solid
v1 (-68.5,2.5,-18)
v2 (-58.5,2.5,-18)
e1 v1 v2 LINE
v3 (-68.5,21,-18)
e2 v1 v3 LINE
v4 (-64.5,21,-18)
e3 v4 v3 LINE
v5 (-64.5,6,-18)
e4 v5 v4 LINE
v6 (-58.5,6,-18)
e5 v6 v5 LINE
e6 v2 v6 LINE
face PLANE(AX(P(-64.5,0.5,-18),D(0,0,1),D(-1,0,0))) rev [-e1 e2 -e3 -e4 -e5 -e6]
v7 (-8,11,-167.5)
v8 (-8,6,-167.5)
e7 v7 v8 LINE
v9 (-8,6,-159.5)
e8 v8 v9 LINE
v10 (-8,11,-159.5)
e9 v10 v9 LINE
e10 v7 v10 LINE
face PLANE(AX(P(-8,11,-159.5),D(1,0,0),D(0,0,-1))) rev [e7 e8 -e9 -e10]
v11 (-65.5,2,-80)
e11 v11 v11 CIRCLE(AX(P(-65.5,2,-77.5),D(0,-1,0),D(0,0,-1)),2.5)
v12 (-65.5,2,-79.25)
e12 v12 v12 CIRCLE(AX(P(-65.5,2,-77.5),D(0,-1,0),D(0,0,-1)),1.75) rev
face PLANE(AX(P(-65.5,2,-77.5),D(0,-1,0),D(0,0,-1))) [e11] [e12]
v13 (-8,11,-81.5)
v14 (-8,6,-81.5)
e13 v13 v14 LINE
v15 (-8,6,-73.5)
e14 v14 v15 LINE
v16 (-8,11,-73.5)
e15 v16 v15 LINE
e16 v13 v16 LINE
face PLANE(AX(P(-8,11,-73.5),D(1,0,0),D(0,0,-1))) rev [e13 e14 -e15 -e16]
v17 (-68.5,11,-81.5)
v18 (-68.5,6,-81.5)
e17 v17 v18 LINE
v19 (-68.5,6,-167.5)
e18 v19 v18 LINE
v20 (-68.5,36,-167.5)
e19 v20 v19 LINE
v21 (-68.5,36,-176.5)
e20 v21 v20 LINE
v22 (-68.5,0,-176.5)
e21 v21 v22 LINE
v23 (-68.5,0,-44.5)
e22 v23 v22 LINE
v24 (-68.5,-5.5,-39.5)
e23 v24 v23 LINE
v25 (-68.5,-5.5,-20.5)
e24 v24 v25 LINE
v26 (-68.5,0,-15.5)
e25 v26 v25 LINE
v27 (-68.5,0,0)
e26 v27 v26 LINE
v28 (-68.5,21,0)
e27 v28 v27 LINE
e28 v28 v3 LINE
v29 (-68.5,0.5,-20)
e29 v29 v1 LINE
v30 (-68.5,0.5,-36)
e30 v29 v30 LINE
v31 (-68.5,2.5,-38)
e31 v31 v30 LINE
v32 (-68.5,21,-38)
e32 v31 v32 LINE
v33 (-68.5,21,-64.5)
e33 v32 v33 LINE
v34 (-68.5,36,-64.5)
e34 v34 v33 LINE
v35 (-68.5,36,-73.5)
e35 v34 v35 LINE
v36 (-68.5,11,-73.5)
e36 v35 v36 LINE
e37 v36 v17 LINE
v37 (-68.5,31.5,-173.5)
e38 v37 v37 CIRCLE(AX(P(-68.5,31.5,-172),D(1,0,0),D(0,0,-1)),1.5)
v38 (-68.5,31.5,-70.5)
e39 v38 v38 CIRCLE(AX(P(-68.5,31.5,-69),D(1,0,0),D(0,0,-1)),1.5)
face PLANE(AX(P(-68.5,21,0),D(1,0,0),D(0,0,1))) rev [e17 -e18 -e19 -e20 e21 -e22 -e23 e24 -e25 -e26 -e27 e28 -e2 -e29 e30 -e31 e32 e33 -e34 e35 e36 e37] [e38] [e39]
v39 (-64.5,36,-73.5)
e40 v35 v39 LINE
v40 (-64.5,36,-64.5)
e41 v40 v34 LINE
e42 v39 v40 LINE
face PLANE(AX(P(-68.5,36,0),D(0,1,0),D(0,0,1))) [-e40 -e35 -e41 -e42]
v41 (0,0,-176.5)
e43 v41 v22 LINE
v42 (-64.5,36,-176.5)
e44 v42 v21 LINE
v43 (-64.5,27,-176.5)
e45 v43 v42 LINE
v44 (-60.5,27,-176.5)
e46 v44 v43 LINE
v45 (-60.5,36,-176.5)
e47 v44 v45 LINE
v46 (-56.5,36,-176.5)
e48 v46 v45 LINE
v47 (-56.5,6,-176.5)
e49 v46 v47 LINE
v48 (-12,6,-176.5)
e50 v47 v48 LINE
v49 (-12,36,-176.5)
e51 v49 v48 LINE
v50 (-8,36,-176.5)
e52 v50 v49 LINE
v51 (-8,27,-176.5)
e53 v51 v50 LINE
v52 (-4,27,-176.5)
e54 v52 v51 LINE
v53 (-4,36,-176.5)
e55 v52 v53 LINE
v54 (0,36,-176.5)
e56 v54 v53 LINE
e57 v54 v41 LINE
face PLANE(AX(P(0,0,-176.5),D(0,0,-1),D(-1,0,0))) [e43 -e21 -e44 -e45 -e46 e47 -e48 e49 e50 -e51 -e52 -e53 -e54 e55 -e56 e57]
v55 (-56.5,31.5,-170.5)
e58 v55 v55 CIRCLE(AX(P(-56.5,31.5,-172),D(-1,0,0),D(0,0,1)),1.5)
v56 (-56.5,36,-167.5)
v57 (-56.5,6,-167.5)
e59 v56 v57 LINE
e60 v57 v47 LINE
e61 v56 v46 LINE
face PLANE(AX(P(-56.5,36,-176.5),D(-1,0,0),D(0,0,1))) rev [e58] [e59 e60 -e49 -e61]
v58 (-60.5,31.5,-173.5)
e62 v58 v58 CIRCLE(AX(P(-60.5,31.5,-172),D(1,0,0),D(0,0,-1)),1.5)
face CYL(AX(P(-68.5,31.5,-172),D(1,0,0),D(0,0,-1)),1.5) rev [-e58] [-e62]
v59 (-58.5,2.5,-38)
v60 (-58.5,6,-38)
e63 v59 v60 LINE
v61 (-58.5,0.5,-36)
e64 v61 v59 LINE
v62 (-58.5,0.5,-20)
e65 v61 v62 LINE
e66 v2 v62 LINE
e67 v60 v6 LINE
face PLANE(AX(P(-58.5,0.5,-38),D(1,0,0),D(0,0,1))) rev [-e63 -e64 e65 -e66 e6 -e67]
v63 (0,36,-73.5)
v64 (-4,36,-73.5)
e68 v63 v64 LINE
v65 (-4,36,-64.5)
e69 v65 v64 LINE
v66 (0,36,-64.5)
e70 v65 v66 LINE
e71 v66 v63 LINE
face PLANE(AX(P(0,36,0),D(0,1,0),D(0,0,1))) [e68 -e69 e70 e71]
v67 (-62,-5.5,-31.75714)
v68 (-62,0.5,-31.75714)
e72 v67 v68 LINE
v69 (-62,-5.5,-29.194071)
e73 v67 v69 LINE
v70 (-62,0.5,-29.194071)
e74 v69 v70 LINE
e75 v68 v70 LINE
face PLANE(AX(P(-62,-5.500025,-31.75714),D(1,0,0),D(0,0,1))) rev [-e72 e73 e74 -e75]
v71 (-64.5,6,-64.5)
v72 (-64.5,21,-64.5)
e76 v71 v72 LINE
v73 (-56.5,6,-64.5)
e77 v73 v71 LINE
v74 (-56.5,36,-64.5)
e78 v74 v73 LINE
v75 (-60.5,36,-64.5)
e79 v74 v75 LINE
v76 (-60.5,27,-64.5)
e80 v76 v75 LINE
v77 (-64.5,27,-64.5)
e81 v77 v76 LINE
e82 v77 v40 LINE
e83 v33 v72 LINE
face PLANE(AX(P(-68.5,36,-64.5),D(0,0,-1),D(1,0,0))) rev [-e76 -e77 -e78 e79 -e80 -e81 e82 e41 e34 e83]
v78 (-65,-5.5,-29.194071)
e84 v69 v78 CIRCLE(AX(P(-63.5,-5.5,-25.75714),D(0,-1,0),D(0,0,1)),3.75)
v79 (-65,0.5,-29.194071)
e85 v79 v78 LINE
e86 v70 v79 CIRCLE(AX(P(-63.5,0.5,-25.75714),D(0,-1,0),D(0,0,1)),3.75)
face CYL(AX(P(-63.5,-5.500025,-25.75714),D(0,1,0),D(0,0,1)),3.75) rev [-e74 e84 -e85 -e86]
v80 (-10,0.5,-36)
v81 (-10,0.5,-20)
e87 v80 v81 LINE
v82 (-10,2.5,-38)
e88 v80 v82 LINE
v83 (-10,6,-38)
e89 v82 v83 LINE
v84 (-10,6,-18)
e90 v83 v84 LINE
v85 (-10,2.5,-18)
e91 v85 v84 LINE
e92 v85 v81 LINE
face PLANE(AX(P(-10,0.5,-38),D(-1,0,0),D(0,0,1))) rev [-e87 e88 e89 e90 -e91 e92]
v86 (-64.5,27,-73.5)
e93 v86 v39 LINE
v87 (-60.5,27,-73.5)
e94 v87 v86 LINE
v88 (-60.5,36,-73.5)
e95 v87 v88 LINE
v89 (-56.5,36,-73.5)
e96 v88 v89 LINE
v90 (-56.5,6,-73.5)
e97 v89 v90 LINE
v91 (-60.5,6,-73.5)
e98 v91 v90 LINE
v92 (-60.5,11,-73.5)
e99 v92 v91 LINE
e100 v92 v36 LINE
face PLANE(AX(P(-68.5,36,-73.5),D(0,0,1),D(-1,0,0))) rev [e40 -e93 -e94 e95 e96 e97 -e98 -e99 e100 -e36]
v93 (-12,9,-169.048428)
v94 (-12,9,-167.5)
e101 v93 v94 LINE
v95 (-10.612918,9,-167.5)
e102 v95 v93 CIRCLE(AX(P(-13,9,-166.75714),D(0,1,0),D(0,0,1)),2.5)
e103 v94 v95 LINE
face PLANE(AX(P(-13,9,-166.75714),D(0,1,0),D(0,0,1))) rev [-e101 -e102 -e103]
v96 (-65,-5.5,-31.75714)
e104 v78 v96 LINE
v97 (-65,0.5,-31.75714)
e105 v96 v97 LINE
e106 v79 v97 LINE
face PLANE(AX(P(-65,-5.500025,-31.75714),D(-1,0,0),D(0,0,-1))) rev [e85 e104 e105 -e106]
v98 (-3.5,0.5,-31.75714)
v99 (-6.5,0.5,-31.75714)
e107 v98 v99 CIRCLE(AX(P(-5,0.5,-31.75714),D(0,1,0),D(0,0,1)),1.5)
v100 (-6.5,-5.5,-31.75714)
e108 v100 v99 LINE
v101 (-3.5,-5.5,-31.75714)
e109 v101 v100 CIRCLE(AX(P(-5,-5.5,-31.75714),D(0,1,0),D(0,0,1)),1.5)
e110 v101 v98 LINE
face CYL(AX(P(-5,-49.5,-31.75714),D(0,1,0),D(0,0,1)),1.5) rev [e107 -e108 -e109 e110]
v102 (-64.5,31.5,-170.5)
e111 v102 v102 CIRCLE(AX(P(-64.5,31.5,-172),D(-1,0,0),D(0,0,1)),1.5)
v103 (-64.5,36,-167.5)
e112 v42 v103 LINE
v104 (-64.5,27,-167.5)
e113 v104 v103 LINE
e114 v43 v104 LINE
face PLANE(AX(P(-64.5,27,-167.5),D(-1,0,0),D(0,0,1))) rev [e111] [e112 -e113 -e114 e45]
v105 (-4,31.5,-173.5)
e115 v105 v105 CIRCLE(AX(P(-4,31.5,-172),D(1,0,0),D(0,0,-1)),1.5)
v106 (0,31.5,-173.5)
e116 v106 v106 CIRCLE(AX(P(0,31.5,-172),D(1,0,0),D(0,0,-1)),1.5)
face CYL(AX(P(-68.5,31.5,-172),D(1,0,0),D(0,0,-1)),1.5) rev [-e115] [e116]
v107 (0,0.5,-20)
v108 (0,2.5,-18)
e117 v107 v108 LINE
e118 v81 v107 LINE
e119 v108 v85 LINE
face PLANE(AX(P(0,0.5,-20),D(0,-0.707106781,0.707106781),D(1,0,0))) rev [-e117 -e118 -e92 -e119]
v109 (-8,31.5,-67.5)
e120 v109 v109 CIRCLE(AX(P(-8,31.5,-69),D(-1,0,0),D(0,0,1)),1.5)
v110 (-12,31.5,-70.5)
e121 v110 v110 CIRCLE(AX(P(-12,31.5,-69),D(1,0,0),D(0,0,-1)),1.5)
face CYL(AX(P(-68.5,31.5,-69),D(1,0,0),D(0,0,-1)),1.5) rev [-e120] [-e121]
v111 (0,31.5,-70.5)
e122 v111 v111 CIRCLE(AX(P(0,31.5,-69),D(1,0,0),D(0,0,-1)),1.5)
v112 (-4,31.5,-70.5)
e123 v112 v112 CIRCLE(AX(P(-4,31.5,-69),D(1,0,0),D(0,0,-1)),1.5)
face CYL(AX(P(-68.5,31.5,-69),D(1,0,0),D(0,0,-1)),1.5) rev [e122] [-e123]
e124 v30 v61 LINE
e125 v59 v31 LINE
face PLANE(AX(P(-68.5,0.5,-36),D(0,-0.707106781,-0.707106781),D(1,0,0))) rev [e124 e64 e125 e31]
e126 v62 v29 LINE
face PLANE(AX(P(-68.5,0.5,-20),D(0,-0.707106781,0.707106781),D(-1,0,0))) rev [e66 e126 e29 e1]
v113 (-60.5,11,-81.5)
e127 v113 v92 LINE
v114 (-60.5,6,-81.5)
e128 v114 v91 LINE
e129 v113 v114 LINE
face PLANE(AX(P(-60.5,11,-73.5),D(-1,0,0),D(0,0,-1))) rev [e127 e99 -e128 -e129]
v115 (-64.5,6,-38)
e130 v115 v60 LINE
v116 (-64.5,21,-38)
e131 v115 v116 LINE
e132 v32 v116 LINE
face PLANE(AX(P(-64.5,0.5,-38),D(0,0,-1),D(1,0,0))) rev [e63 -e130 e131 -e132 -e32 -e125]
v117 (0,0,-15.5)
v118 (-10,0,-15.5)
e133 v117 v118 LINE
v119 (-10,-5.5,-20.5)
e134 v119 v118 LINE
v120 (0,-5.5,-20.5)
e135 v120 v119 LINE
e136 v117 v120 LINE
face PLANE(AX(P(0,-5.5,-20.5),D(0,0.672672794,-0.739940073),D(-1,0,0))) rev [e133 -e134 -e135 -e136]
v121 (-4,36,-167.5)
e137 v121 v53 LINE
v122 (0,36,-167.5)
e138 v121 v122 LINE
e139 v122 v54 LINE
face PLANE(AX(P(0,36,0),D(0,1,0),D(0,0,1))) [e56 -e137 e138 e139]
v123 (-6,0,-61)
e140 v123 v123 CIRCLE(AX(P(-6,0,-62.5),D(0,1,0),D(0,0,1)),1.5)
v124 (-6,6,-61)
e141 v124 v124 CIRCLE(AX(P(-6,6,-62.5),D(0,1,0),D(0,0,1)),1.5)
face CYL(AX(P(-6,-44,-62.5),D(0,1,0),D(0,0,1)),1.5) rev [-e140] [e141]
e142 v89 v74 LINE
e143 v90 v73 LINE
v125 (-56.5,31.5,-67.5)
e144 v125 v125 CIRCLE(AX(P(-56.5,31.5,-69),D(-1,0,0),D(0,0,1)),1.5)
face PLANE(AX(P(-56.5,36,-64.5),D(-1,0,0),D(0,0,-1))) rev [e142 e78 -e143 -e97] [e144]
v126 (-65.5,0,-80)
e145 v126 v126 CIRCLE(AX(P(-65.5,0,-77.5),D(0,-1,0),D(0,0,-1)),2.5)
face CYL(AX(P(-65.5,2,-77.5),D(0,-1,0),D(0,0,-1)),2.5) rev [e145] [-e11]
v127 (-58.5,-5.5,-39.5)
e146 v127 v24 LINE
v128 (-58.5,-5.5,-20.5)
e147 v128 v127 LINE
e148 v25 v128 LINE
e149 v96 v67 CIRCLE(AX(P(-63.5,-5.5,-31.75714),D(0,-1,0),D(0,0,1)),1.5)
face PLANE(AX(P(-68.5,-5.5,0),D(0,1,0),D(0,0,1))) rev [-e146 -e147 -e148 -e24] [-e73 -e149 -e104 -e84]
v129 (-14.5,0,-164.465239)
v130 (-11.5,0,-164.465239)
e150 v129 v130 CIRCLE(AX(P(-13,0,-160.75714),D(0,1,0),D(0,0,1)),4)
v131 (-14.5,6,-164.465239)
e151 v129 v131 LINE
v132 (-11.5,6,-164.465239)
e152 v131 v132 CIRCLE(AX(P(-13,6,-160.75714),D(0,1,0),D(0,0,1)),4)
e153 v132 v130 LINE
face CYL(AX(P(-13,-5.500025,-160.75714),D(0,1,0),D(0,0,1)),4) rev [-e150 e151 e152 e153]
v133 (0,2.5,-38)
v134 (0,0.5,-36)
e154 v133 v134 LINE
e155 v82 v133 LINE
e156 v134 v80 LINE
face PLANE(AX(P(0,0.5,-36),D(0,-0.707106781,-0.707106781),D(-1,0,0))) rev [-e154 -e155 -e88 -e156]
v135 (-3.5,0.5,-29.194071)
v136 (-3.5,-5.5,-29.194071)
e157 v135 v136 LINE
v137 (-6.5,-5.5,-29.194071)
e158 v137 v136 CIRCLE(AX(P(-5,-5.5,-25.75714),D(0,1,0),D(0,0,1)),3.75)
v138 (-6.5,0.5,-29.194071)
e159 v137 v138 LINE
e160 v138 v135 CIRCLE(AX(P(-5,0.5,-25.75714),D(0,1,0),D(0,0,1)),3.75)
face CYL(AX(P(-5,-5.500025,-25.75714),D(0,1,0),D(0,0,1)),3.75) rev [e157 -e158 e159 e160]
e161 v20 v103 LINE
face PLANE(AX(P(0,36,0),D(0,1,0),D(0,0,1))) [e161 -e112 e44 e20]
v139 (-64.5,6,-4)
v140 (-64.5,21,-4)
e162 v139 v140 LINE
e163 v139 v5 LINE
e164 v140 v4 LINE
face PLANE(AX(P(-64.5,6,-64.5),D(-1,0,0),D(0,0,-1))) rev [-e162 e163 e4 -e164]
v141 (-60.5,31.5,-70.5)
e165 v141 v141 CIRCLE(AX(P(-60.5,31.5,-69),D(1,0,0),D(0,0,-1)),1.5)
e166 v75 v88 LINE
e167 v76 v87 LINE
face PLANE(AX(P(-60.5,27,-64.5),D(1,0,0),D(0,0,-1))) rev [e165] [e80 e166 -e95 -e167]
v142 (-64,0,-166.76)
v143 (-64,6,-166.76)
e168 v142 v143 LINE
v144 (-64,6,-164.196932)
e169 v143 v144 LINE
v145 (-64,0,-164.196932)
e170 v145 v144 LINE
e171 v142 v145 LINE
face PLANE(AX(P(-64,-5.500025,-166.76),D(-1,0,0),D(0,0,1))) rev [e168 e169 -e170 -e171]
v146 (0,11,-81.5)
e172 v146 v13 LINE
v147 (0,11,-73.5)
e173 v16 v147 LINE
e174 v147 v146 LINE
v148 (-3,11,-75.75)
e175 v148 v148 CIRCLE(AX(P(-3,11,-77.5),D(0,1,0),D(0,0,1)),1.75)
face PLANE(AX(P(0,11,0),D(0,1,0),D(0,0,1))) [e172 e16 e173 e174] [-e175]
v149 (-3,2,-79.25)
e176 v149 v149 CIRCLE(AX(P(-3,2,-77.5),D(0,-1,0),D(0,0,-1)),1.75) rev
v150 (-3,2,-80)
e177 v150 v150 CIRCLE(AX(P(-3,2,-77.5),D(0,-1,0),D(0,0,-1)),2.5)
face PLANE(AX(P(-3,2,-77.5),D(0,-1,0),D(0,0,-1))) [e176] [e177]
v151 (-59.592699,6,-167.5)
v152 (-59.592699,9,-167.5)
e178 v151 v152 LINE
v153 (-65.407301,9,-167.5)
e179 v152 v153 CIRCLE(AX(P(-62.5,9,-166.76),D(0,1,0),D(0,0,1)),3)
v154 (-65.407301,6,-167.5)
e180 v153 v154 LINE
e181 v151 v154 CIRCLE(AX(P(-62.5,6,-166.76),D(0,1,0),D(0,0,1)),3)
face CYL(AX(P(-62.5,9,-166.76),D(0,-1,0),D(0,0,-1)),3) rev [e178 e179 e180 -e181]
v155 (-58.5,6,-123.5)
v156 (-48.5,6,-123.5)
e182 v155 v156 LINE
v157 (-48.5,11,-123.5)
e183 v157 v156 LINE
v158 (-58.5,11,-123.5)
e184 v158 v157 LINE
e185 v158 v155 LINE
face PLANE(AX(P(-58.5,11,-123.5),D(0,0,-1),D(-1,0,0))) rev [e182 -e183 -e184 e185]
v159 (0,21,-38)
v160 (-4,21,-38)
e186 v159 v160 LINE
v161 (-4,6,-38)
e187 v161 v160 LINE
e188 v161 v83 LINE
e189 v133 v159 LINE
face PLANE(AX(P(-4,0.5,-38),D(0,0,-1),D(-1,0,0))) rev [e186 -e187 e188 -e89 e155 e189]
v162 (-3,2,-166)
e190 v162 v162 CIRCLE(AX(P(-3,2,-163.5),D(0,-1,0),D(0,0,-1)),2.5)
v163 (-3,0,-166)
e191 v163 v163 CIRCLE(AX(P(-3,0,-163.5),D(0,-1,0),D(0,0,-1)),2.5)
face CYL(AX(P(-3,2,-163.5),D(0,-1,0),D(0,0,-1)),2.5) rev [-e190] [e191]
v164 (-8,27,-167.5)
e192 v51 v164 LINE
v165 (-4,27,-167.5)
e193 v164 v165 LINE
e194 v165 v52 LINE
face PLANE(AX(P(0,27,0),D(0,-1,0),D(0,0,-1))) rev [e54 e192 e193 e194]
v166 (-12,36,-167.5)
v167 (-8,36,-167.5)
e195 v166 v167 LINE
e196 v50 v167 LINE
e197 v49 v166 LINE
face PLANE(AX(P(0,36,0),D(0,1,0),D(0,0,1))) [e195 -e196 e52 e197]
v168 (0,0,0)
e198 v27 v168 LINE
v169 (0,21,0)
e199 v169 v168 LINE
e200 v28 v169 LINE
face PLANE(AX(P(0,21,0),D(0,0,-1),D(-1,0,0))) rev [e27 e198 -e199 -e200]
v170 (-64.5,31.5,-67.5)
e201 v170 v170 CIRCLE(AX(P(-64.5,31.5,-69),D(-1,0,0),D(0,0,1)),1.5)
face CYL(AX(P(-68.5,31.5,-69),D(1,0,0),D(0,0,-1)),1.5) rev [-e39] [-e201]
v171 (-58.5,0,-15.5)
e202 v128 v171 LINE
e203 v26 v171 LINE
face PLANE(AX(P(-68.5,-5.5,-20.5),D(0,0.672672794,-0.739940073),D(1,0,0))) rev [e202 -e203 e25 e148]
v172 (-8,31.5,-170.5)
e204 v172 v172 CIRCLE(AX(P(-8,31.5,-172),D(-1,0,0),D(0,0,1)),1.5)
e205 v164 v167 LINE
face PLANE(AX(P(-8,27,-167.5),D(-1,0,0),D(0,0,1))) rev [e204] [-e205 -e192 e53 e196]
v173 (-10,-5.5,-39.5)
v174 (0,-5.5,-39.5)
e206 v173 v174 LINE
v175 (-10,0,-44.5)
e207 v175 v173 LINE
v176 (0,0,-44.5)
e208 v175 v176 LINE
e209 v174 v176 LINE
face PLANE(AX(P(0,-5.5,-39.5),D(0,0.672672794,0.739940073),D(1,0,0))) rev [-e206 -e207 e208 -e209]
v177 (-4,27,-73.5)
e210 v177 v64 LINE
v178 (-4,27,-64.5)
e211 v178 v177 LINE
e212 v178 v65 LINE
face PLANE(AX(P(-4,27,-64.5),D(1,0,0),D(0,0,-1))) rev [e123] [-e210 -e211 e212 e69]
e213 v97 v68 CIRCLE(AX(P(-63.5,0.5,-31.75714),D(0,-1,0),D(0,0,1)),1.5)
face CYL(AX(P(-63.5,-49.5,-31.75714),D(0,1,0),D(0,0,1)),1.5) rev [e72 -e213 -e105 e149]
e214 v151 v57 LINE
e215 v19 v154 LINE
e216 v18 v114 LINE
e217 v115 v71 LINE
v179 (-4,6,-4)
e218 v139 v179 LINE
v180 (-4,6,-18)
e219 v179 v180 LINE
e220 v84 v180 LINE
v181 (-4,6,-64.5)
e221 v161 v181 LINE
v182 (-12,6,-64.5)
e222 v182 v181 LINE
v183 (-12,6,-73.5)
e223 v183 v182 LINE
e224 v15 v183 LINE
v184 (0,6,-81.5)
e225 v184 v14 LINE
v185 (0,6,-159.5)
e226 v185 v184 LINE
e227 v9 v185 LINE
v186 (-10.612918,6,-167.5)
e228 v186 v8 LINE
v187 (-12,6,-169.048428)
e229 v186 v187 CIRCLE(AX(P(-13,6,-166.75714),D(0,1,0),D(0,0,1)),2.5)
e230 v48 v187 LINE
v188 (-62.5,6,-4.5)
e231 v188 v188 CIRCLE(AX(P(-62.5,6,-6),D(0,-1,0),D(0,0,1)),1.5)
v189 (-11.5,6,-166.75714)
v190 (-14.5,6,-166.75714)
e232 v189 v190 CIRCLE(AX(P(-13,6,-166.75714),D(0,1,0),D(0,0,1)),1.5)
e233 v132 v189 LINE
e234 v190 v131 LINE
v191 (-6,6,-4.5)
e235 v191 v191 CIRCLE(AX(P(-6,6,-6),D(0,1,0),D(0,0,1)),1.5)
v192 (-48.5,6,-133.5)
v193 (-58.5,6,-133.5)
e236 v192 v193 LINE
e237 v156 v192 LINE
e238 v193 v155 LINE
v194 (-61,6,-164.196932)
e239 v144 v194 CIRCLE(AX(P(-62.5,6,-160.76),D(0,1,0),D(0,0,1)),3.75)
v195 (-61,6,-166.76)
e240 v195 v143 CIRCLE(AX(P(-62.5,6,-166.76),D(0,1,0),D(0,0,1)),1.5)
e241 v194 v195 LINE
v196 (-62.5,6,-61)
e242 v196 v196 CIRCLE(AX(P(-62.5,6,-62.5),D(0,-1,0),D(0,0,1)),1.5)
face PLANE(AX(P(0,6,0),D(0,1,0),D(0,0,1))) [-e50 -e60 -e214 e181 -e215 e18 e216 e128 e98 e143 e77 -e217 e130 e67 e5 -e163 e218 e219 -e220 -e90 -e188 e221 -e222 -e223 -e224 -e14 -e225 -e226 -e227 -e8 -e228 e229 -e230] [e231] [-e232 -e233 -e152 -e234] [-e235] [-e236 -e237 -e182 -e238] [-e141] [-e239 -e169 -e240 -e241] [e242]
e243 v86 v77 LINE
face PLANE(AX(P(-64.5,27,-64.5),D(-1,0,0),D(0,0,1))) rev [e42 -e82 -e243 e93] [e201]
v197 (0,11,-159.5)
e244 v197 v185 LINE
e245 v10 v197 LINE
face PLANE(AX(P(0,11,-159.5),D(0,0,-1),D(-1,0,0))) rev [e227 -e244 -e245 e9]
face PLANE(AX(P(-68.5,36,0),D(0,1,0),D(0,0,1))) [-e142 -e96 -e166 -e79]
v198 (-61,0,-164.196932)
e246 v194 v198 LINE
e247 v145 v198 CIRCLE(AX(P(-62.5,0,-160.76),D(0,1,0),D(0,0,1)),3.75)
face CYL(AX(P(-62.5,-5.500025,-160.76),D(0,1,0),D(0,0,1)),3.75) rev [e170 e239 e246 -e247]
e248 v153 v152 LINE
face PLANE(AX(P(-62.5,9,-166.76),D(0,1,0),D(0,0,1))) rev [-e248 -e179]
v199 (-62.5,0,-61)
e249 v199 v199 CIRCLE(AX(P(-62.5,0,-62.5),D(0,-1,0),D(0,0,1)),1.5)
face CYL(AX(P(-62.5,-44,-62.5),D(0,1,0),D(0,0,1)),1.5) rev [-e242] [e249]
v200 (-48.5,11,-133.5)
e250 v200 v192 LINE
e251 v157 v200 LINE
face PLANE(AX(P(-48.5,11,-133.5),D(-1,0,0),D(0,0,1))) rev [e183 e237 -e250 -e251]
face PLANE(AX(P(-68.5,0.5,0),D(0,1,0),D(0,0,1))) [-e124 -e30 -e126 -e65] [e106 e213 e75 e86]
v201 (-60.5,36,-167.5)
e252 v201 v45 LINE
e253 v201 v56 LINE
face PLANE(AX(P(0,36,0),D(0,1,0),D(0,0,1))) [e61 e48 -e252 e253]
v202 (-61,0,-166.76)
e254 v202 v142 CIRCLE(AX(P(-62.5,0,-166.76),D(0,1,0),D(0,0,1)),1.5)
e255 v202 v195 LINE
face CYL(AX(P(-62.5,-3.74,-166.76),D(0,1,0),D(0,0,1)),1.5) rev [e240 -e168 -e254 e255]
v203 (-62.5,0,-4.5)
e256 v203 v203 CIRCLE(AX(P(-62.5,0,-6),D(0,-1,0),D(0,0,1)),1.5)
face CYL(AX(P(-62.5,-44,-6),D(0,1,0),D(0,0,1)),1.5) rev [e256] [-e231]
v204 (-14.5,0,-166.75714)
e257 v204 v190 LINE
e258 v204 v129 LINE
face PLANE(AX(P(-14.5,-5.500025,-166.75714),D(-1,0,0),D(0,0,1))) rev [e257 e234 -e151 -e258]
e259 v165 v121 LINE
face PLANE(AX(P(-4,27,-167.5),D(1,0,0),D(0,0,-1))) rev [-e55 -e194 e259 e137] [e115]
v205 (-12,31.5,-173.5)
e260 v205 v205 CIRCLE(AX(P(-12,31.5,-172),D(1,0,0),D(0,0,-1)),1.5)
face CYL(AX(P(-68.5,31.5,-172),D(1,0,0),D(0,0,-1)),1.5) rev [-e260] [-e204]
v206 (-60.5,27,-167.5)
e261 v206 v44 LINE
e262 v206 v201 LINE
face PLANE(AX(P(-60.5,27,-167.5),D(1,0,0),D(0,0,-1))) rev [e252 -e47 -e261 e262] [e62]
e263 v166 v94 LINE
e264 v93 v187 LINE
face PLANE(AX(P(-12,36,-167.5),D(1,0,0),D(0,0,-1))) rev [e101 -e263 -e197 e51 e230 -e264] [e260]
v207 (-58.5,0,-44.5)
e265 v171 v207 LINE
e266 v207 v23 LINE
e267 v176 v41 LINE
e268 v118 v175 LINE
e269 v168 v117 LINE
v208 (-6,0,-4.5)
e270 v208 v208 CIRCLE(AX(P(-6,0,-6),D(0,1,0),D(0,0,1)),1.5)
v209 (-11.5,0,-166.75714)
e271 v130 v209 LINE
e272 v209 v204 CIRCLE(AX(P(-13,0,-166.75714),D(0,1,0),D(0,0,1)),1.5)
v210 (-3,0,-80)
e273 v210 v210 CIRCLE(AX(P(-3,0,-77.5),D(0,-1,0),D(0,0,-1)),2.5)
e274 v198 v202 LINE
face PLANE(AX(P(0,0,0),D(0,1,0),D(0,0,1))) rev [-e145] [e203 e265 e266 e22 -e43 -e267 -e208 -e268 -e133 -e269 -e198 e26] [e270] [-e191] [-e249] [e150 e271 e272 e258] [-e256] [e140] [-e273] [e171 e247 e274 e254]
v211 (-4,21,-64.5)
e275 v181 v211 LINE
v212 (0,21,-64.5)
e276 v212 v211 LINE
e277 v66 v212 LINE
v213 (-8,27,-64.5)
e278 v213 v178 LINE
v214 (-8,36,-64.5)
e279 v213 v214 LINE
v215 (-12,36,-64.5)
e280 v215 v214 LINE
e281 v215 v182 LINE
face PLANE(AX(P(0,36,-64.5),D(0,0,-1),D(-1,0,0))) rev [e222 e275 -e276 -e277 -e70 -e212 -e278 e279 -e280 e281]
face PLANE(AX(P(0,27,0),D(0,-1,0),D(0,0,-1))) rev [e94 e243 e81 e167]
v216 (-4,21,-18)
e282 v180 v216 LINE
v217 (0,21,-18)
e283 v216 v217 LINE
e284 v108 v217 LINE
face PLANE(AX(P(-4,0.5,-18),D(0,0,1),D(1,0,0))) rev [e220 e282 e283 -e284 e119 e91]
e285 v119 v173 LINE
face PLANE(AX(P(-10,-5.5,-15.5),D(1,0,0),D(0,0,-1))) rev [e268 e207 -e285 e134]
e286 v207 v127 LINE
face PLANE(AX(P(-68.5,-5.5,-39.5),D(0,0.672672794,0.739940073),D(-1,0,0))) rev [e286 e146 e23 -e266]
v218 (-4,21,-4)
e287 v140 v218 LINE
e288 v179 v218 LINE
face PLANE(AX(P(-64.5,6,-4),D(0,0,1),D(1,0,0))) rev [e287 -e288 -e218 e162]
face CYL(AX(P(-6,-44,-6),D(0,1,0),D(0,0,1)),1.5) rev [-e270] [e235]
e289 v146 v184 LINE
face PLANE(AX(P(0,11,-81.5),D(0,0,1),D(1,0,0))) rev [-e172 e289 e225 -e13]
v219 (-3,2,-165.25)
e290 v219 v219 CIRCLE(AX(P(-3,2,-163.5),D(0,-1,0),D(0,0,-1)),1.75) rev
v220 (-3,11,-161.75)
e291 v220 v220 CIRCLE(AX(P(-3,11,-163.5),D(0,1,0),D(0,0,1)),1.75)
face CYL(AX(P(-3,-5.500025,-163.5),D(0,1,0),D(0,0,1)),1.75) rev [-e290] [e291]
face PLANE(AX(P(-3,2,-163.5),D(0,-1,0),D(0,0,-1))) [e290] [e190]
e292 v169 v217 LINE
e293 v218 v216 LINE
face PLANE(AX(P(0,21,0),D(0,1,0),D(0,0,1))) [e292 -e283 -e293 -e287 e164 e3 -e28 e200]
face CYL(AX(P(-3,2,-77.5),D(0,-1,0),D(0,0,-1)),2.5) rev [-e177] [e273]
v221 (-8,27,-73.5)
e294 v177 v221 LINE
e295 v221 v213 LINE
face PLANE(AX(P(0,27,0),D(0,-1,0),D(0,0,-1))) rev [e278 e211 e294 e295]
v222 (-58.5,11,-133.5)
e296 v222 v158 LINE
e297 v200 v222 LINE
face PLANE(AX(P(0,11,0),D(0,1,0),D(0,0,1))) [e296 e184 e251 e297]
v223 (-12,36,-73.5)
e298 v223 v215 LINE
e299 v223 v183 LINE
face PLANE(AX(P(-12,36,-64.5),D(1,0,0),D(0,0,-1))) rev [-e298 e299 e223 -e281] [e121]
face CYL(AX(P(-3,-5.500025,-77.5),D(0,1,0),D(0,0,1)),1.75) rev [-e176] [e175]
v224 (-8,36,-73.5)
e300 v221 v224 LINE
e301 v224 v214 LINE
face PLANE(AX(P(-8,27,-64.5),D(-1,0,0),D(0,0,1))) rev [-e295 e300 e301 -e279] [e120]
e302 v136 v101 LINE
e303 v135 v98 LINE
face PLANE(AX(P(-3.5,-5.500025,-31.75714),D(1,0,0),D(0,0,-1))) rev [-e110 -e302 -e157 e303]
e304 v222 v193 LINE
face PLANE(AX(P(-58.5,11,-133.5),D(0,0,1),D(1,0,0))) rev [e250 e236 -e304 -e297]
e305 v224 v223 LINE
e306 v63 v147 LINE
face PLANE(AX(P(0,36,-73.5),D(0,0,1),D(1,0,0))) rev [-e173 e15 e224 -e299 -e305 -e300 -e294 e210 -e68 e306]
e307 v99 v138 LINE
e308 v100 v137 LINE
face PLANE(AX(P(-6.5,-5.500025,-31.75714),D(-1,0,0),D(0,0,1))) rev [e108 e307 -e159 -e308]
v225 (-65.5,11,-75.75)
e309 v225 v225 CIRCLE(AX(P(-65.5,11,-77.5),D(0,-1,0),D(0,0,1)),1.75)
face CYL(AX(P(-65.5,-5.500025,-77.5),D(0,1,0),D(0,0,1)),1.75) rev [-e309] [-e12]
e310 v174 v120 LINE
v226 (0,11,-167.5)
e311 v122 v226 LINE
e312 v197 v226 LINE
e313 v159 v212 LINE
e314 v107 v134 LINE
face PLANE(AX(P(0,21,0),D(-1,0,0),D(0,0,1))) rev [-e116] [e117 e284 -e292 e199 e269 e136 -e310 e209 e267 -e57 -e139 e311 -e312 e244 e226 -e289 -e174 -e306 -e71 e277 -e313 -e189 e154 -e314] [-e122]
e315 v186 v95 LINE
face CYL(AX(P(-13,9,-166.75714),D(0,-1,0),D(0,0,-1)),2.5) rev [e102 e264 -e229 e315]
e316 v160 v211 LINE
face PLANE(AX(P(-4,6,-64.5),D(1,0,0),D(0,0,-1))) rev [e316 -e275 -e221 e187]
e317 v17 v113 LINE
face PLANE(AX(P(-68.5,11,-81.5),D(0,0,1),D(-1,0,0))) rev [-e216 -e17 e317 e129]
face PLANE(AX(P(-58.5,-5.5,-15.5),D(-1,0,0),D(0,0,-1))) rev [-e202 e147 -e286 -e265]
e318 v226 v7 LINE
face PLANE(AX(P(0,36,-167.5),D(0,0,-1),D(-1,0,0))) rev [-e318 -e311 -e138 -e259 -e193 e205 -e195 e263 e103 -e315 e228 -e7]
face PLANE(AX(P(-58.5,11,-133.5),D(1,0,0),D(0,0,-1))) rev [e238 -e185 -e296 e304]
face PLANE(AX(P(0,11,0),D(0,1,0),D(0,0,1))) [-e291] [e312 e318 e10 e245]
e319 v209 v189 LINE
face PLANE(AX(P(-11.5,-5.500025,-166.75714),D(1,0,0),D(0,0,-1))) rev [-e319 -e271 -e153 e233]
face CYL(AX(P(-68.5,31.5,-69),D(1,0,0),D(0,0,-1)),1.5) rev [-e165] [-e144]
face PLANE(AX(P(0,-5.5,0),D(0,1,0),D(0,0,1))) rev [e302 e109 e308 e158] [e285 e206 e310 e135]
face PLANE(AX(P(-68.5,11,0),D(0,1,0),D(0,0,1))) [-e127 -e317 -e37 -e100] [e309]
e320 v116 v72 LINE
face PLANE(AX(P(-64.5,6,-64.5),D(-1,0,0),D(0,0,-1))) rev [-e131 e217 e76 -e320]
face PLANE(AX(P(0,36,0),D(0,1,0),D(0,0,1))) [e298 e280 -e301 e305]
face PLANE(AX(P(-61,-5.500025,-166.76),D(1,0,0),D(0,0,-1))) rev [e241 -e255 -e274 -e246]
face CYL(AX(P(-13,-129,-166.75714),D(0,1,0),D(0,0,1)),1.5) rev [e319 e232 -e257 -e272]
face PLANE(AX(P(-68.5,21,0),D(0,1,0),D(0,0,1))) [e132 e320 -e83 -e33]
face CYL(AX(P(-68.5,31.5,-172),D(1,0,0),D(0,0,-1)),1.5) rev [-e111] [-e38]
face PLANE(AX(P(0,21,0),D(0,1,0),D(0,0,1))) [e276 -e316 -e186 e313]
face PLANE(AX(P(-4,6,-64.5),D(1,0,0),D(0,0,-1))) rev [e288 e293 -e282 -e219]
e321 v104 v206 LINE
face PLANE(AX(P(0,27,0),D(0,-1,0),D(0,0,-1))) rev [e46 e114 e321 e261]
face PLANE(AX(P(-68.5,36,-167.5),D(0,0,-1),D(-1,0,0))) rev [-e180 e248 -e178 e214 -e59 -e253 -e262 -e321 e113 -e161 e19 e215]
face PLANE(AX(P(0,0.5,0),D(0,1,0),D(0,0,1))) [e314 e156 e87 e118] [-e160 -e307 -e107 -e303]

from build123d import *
from OCP.BRepFilletAPI import BRepFilletAPI_MakeChamfer

# Parameters (mm, degrees)
SKETCH1_W            = 68.5
SKETCH1_H            = 64.5
BOSS_EXTRUDE3_DEPTH  = 21
SKETCH3_W            = 60.5
SKETCH3_H            = 60.5
CUT_EXTRUDE1_DEPTH   = 15
SKETCH5_W            = 68.5
SKETCH5_H            = 6
BOSS_EXTRUDE4_DEPTH  = 105
SKETCH10_W           = 10
SKETCH10_H           = 29
BOSS_EXTRUDE5_DEPTH  = 5.5
SKETCH9_W            = 4
SKETCH9_H            = 20
CUT_EXTRUDE2_DEPTH   = 20.5
SKETCH11_W           = 6
SKETCH11_H           = 20
CUT_EXTRUDE3_DEPTH   = 5.5
CHAMFER2_SIZE        = 5.5
CHAMFER2_SIZE_2      = 5
CHAMFER3_SIZE        = 2
SKETCH12_W           = 34.25
SKETCH12_H           = 169.5
CUT_EXTRUDE4_DEPTH   = 50
SKETCH15_R           = 1.5
CUT_EXTRUDE5_DEPTH   = 50
SKETCH16_R           = 1.5
CUT_EXTRUDE6_DEPTH   = 50
SKETCH17_R           = 1.5
CUT_EXTRUDE7_DEPTH   = 50
SKETCH19_W           = 34.25
SKETCH19_H           = 6
BOSS_EXTRUDE6_DEPTH  = 7
SKETCH26_W           = 12
SKETCH26_H           = 9
BOSS_EXTRUDE7_DEPTH  = 30
SKETCH20_R           = 3.75
CUT_EXTRUDE9_DEPTH   = 184.263642057
SKETCH21_W           = 3
SKETCH21_H           = 2.563068229
CUT_EXTRUDE10_DEPTH  = 184.263642057
SKETCH18_R           = 1.5
CUT_EXTRUDE8_DEPTH   = 135
SKETCH24_R           = 4
CUT_EXTRUDE13_DEPTH  = 183.278118544
SKETCH25_W           = 3
SKETCH25_H           = 2.291900756
CUT_EXTRUDE14_DEPTH  = 183.278118544
SKETCH27_R           = 1.75
CUT_EXTRUDE15_DEPTH  = 183.278118544
BOSS_EXTRUDE9_START  = 5
SKETCH30_W           = 8
SKETCH30_H           = 8
SKETCH30_R           = 1.75
BOSS_EXTRUDE9_DEPTH  = 5
SKETCH31_W           = 8
SKETCH31_H           = 8
CUT_EXTRUDE16_DEPTH  = 5
SKETCH32_W           = 19.705511252
SKETCH32_H           = 22.257631466
BOSS_EXTRUDE10_DEPTH = 6
SKETCH33_R           = 1.5
CUT_EXTRUDE17_DEPTH  = 9.74
SKETCH34_R           = 3.75
CUT_EXTRUDE18_DEPTH  = 192.688549475
SKETCH36_R           = 2.5
CUT_EXTRUDE20_DEPTH  = 2
SKETCH39_W           = 3
SKETCH39_H           = 4.259893973
CUT_EXTRUDE22_DEPTH  = 192.688549475
SKETCH41_W           = 12
SKETCH41_H           = 9
BOSS_EXTRUDE11_DEPTH = 30
SKETCH42_R           = 3
CUT_EXTRUDE23_DEPTH  = 3
SKETCH44_W           = 10
SKETCH44_H           = 10
BOSS_EXTRUDE12_DEPTH = 5
SKETCH47_R           = 2.5
CUT_EXTRUDE26_DEPTH  = 3
SKETCH46_W           = 4
SKETCH46_H           = 9
CUT_EXTRUDE27_DEPTH  = 9
CUT_EXTRUDE28_START  = -68.5
SKETCH48_R           = 1.5
CUT_EXTRUDE28_DEPTH  = 68.5


with BuildPart() as part:
    # Sketch1 → Boss-Extrude3 (new body)
    with BuildSketch(Plane(origin=(0, 0, 0), x_dir=(1, 0, 0), z_dir=(0, 1, 0))):
        with Locations((-34.25, 32.25)):
            Rectangle(SKETCH1_W, SKETCH1_H)
    extrude(amount=BOSS_EXTRUDE3_DEPTH)

    # Sketch3 → Cut-Extrude1 (cut)
    with BuildSketch(Plane(origin=(0, 21, 0), x_dir=(1, 0, 0), z_dir=(0, 1, 0))):
        with Locations((-34.25, 34.25)):
            Rectangle(SKETCH3_W, SKETCH3_H)
    extrude(amount=-CUT_EXTRUDE1_DEPTH, mode=Mode.SUBTRACT)

    # Sketch5 → Boss-Extrude4 (add)
    with BuildSketch(Plane(origin=(0, 0, -64.5), x_dir=(-1, 0, 0), z_dir=(0, 0, -1))):
        with Locations((34.25, 3)):
            Rectangle(SKETCH5_W, SKETCH5_H)
    extrude(amount=BOSS_EXTRUDE4_DEPTH)

    # Sketch10 → Boss-Extrude5 (add)
    with BuildSketch(Plane.XZ):
        with Locations((-5, -30)):
            Rectangle(SKETCH10_W, SKETCH10_H)
    extrude(amount=BOSS_EXTRUDE5_DEPTH)

    # Sketch9 → Cut-Extrude2 (cut)
    with BuildSketch(Plane(origin=(0, 21, 0), x_dir=(1, 0, 0), z_dir=(0, 1, 0))):
        with Locations((-2, 28)):
            Rectangle(SKETCH9_W, SKETCH9_H)
    extrude(amount=-CUT_EXTRUDE2_DEPTH, mode=Mode.SUBTRACT)

    # Sketch11 → Cut-Extrude3 (cut)
    with BuildSketch(Plane(origin=(0, 6, 0), x_dir=(1, 0, 0), z_dir=(0, 1, 0))):
        with Locations((-7, 28)):
            Rectangle(SKETCH11_W, SKETCH11_H)
    extrude(amount=-CUT_EXTRUDE3_DEPTH, mode=Mode.SUBTRACT)

    # Chamfer2
    chamfer2_edges_1 = [part.edges().sort_by_distance(p)[0] for p in [
        (-5, -5.5, -44.5),
    ]]
    chamfer2_side_1 = [part.faces().sort_by_distance(p)[0] for p in [
        (-5, -5.4, -44.5),
    ]]
    chamfer2_edges_2 = [part.edges().sort_by_distance(p)[0] for p in [
        (-5, -5.5, -15.5),
    ]]
    chamfer2_side_2 = [part.faces().sort_by_distance(p)[0] for p in [
        (-5, -5.5, -15.6),
    ]]
    chamfer2 = BRepFilletAPI_MakeChamfer(part.part.solid().wrapped)
    for e in chamfer2_edges_1:
        chamfer2.Add(CHAMFER2_SIZE - 0.0001, CHAMFER2_SIZE_2 - 0.0001, e.wrapped, chamfer2_side_1[0].wrapped)
    for e in chamfer2_edges_2:
        chamfer2.Add(CHAMFER2_SIZE_2 - 0.0001, CHAMFER2_SIZE - 0.0001, e.wrapped, chamfer2_side_2[0].wrapped)
    add(Compound.cast(chamfer2.Shape()), mode=Mode.REPLACE)  # a hair under: the kernel refuses the full size

    # Chamfer3
    chamfer3_edges = [part.edges().sort_by_distance(p)[0] for p in [
        (-5, 0.5, -38),
        (-5, 0.5, -18),
    ]]
    chamfer(chamfer3_edges, length=CHAMFER3_SIZE)

    # Sketch12 → Cut-Extrude4 (cut)
    with BuildSketch(Plane(origin=(0, 21, 0), x_dir=(1, 0, 0), z_dir=(0, 1, 0))):
        with Locations((-51.375, 84.75)):
            Rectangle(SKETCH12_W, SKETCH12_H)
    extrude(amount=-CUT_EXTRUDE4_DEPTH, mode=Mode.SUBTRACT)

    # Sketch15 → Cut-Extrude5 (cut)
    with BuildSketch(Plane(origin=(0, 0.5, 0), x_dir=(1, 0, 0), z_dir=(0, 1, 0))):
        with Locations(Location((-5, 31.75713966, 0), (0, 0, 270))):
            Circle(SKETCH15_R)
    extrude(amount=-CUT_EXTRUDE5_DEPTH, mode=Mode.SUBTRACT)

    # Sketch16 → Cut-Extrude6 (cut)
    with BuildSketch(Plane(origin=(0, 6, 0), x_dir=(1, 0, 0), z_dir=(0, 1, 0))):
        with Locations(Location((-6, 6, 0), (0, 0, 270))):
            Circle(SKETCH16_R)
    extrude(amount=-CUT_EXTRUDE6_DEPTH, mode=Mode.SUBTRACT)

    # Sketch17 → Cut-Extrude7 (cut)
    with BuildSketch(Plane(origin=(0, 6, 0), x_dir=(1, 0, 0), z_dir=(0, 1, 0))):
        with Locations(Location((-6, 62.5, 0), (0, 0, 270))):
            Circle(SKETCH17_R)
    extrude(amount=-CUT_EXTRUDE7_DEPTH, mode=Mode.SUBTRACT)

    # Sketch19 → Boss-Extrude6 (add)
    with BuildSketch(Plane(origin=(0, 0, -169.5), x_dir=(-1, 0, 0), z_dir=(0, 0, -1))):
        with Locations((17.125, 3)):
            Rectangle(SKETCH19_W, SKETCH19_H)
    extrude(amount=BOSS_EXTRUDE6_DEPTH)

    # Sketch26 → Boss-Extrude7 (add)
    with BuildSketch(Plane(origin=(0, 6, 0), x_dir=(1, 0, 0), z_dir=(0, 1, 0))):
        with Locations((-6, 69)):
            Rectangle(SKETCH26_W, SKETCH26_H)
    extrude(amount=BOSS_EXTRUDE7_DEPTH)

    # Sketch20 → Cut-Extrude9 (cut, through all)
    with BuildSketch(Plane(origin=(0, 0.5, 0), x_dir=(1, 0, 0), z_dir=(0, 1, 0))):
        with Locations(Location((-5, 25.75713966, 0), (0, 0, 270))):
            Circle(SKETCH20_R)
    extrude(amount=-CUT_EXTRUDE9_DEPTH, mode=Mode.SUBTRACT)

    # Sketch21 → Cut-Extrude10 (cut, through all)
    with BuildSketch(Plane(origin=(0, 0.5, 0), x_dir=(1, 0, 0), z_dir=(0, 1, 0))):
        with Locations((-5, 30.475605546)):
            Rectangle(SKETCH21_W, SKETCH21_H)
    extrude(amount=-CUT_EXTRUDE10_DEPTH, mode=Mode.SUBTRACT)

    # Sketch18 → Cut-Extrude8 (cut)
    with BuildSketch(Plane(origin=(0, 6, 0), x_dir=(1, 0, 0), z_dir=(0, 1, 0))):
        with Locations(Location((-13, 166.75713966, 0), (0, 0, 270))):
            Circle(SKETCH18_R)
    extrude(amount=-CUT_EXTRUDE8_DEPTH, mode=Mode.SUBTRACT)

    # Sketch24 → Cut-Extrude13 (cut, through all)
    with BuildSketch(Plane(origin=(0, 6, 0), x_dir=(1, 0, 0), z_dir=(0, 1, 0))):
        with Locations(Location((-13, 160.75713966, 0), (0, 0, 270))):
            Circle(SKETCH24_R)
    extrude(amount=-CUT_EXTRUDE13_DEPTH, mode=Mode.SUBTRACT)

    # Sketch25 → Cut-Extrude14 (cut, through all)
    with BuildSketch(Plane(origin=(0, 6, 0), x_dir=(1, 0, 0), z_dir=(0, 1, 0))):
        with Locations((-13, 165.611189282)):
            Rectangle(SKETCH25_W, SKETCH25_H)
    extrude(amount=-CUT_EXTRUDE14_DEPTH, mode=Mode.SUBTRACT)

    # Sketch27 → Cut-Extrude15 (cut, through all)
    with BuildSketch(Plane(origin=(0, 6, 0), x_dir=(1, 0, 0), z_dir=(0, 1, 0))):
        with Locations(Location((-3, 77.5, 0), (0, 0, 270))):
            Circle(SKETCH27_R)
        with Locations(Location((-3, 163.5, 0), (0, 0, 270))):
            Circle(SKETCH27_R)
    extrude(amount=-CUT_EXTRUDE15_DEPTH, mode=Mode.SUBTRACT)

    # Sketch30 → Boss-Extrude9 (add)
    # profile 1 of 2: a face of its own
    with BuildSketch(Plane(origin=(0, 6, 0), x_dir=(1, 0, 0), z_dir=(0, 1, 0)).offset(BOSS_EXTRUDE9_START)):
        with Locations((-4, 77.5)):
            Rectangle(SKETCH30_W, SKETCH30_H)
        with Locations(Location((-3, 77.5, 0), (0, 0, 270))):
            Circle(SKETCH30_R, mode=Mode.SUBTRACT)
    # profile 2 of 2: a face of its own
    with BuildSketch(Plane(origin=(0, 6, 0), x_dir=(1, 0, 0), z_dir=(0, 1, 0)).offset(BOSS_EXTRUDE9_START)):
        with Locations((-4, 163.5)):
            Rectangle(SKETCH30_W, SKETCH30_H)
        with Locations(Location((-3, 163.5, 0), (0, 0, 270))):
            Circle(SKETCH30_R, mode=Mode.SUBTRACT)
    extrude(amount=-BOSS_EXTRUDE9_DEPTH)

    # Mirror5: part across plane


with BuildPart() as part_1:
    add(part.part)
    add(part.part.mirror(Plane(origin=(-34.25, 0, 0), x_dir=(0, 0, 1), z_dir=(1, 0, 0))))

    # Sketch31 → Cut-Extrude16 (cut)
    with BuildSketch(Plane(origin=(0, 11, 0), x_dir=(1, 0, 0), z_dir=(0, 1, 0))):
        with Locations((-64.5, 163.5)):
            Rectangle(SKETCH31_W, SKETCH31_H)
    extrude(amount=-CUT_EXTRUDE16_DEPTH, mode=Mode.SUBTRACT)

    # Sketch32 → Boss-Extrude10 (add)
    with BuildSketch(Plane(origin=(0, 6, 0), x_dir=(1, 0, 0), z_dir=(0, 1, 0))):
        with Locations((-58.647244374, 165.371184267)):
            Rectangle(SKETCH32_W, SKETCH32_H)
    extrude(amount=-BOSS_EXTRUDE10_DEPTH)

    # Sketch33 → Cut-Extrude17 (cut)
    with BuildSketch(Plane(origin=(0, 6, 0), x_dir=(1, 0, 0), z_dir=(0, 1, 0))):
        with Locations(Location((-62.5, 166.76, 0), (0, 0, 270))):
            Circle(SKETCH33_R)
    extrude(amount=-CUT_EXTRUDE17_DEPTH, mode=Mode.SUBTRACT)

    # Sketch34 → Cut-Extrude18 (cut, through all)
    with BuildSketch(Plane(origin=(0, 6, 0), x_dir=(1, 0, 0), z_dir=(0, 1, 0))):
        with Locations(Location((-62.5, 160.76, 0), (0, 0, 270))):
            Circle(SKETCH34_R)
    extrude(amount=-CUT_EXTRUDE18_DEPTH, mode=Mode.SUBTRACT)

    # Sketch36 → Cut-Extrude20 (cut)
    with BuildSketch(Plane.XZ):
        with Locations(Location((-3, -77.5, 0), (0, 0, 270))):
            Circle(SKETCH36_R)
        with Locations(Location((-3, -163.5, 0), (0, 0, 270))):
            Circle(SKETCH36_R)
        with Locations(Location((-65.5, -77.5, 0), (0, 0, 270))):
            Circle(SKETCH36_R)
    extrude(amount=-CUT_EXTRUDE20_DEPTH, mode=Mode.SUBTRACT)

    # Sketch39 → Cut-Extrude22 (cut, through all)
    with BuildSketch(Plane(origin=(0, 6, 0), x_dir=(1, 0, 0), z_dir=(0, 1, 0))):
        with Locations((-62.5, 164.630053014)):
            Rectangle(SKETCH39_W, SKETCH39_H)
    extrude(amount=-CUT_EXTRUDE22_DEPTH, mode=Mode.SUBTRACT)

    # Sketch41 → Boss-Extrude11 (add)
    with BuildSketch(Plane(origin=(0, 6, 0), x_dir=(1, 0, 0), z_dir=(0, 1, 0))):
        with Locations((-6, 172)):
            Rectangle(SKETCH41_W, SKETCH41_H)
        with Locations((-62.5, 172)):
            Rectangle(SKETCH41_W, SKETCH41_H)
    extrude(amount=BOSS_EXTRUDE11_DEPTH)

    # Sketch42 → Cut-Extrude23 (cut)
    with BuildSketch(Plane(origin=(0, 6, 0), x_dir=(1, 0, 0), z_dir=(0, 1, 0))):
        with Locations((-62.5, 166.76)):
            Circle(SKETCH42_R)
    extrude(amount=CUT_EXTRUDE23_DEPTH, mode=Mode.SUBTRACT)

    # Sketch44 → Boss-Extrude12 (add)
    with BuildSketch(Plane(origin=(0, 6, 0), x_dir=(1, 0, 0), z_dir=(0, 1, 0))):
        with Locations((-53.5, 128.5)):
            Rectangle(SKETCH44_W, SKETCH44_H)
    extrude(amount=BOSS_EXTRUDE12_DEPTH)

    # Sketch47 → Cut-Extrude26 (cut)
    with BuildSketch(Plane(origin=(0, 6, 0), x_dir=(1, 0, 0), z_dir=(0, 1, 0))):
        with Locations((-13, 166.75713966)):
            Circle(SKETCH47_R)
    extrude(amount=CUT_EXTRUDE26_DEPTH, mode=Mode.SUBTRACT)

    # Sketch46 → Cut-Extrude27 (cut)
    with BuildSketch(Plane(origin=(0, 36, 0), x_dir=(1, 0, 0), z_dir=(0, 1, 0))):
        with Locations((-6, 69)):
            Rectangle(SKETCH46_W, SKETCH46_H)
        with Locations((-62.5, 69)):
            Rectangle(SKETCH46_W, SKETCH46_H)
        with Locations((-62.5, 172)):
            Rectangle(SKETCH46_W, SKETCH46_H)
        with Locations((-6, 172)):
            Rectangle(SKETCH46_W, SKETCH46_H)
    extrude(amount=-CUT_EXTRUDE27_DEPTH, mode=Mode.SUBTRACT)

    # Sketch48 → Cut-Extrude28 (cut)
    with BuildSketch(Plane(origin=(0, 0, 0), x_dir=(0, 0, -1), z_dir=(1, 0, 0)).offset(CUT_EXTRUDE28_START)):
        with Locations((69, 31.5)):
            Circle(SKETCH48_R)
        with Locations((172, 31.5)):
            Circle(SKETCH48_R)
    extrude(amount=CUT_EXTRUDE28_DEPTH, mode=Mode.SUBTRACT)


solid = part_1.part
